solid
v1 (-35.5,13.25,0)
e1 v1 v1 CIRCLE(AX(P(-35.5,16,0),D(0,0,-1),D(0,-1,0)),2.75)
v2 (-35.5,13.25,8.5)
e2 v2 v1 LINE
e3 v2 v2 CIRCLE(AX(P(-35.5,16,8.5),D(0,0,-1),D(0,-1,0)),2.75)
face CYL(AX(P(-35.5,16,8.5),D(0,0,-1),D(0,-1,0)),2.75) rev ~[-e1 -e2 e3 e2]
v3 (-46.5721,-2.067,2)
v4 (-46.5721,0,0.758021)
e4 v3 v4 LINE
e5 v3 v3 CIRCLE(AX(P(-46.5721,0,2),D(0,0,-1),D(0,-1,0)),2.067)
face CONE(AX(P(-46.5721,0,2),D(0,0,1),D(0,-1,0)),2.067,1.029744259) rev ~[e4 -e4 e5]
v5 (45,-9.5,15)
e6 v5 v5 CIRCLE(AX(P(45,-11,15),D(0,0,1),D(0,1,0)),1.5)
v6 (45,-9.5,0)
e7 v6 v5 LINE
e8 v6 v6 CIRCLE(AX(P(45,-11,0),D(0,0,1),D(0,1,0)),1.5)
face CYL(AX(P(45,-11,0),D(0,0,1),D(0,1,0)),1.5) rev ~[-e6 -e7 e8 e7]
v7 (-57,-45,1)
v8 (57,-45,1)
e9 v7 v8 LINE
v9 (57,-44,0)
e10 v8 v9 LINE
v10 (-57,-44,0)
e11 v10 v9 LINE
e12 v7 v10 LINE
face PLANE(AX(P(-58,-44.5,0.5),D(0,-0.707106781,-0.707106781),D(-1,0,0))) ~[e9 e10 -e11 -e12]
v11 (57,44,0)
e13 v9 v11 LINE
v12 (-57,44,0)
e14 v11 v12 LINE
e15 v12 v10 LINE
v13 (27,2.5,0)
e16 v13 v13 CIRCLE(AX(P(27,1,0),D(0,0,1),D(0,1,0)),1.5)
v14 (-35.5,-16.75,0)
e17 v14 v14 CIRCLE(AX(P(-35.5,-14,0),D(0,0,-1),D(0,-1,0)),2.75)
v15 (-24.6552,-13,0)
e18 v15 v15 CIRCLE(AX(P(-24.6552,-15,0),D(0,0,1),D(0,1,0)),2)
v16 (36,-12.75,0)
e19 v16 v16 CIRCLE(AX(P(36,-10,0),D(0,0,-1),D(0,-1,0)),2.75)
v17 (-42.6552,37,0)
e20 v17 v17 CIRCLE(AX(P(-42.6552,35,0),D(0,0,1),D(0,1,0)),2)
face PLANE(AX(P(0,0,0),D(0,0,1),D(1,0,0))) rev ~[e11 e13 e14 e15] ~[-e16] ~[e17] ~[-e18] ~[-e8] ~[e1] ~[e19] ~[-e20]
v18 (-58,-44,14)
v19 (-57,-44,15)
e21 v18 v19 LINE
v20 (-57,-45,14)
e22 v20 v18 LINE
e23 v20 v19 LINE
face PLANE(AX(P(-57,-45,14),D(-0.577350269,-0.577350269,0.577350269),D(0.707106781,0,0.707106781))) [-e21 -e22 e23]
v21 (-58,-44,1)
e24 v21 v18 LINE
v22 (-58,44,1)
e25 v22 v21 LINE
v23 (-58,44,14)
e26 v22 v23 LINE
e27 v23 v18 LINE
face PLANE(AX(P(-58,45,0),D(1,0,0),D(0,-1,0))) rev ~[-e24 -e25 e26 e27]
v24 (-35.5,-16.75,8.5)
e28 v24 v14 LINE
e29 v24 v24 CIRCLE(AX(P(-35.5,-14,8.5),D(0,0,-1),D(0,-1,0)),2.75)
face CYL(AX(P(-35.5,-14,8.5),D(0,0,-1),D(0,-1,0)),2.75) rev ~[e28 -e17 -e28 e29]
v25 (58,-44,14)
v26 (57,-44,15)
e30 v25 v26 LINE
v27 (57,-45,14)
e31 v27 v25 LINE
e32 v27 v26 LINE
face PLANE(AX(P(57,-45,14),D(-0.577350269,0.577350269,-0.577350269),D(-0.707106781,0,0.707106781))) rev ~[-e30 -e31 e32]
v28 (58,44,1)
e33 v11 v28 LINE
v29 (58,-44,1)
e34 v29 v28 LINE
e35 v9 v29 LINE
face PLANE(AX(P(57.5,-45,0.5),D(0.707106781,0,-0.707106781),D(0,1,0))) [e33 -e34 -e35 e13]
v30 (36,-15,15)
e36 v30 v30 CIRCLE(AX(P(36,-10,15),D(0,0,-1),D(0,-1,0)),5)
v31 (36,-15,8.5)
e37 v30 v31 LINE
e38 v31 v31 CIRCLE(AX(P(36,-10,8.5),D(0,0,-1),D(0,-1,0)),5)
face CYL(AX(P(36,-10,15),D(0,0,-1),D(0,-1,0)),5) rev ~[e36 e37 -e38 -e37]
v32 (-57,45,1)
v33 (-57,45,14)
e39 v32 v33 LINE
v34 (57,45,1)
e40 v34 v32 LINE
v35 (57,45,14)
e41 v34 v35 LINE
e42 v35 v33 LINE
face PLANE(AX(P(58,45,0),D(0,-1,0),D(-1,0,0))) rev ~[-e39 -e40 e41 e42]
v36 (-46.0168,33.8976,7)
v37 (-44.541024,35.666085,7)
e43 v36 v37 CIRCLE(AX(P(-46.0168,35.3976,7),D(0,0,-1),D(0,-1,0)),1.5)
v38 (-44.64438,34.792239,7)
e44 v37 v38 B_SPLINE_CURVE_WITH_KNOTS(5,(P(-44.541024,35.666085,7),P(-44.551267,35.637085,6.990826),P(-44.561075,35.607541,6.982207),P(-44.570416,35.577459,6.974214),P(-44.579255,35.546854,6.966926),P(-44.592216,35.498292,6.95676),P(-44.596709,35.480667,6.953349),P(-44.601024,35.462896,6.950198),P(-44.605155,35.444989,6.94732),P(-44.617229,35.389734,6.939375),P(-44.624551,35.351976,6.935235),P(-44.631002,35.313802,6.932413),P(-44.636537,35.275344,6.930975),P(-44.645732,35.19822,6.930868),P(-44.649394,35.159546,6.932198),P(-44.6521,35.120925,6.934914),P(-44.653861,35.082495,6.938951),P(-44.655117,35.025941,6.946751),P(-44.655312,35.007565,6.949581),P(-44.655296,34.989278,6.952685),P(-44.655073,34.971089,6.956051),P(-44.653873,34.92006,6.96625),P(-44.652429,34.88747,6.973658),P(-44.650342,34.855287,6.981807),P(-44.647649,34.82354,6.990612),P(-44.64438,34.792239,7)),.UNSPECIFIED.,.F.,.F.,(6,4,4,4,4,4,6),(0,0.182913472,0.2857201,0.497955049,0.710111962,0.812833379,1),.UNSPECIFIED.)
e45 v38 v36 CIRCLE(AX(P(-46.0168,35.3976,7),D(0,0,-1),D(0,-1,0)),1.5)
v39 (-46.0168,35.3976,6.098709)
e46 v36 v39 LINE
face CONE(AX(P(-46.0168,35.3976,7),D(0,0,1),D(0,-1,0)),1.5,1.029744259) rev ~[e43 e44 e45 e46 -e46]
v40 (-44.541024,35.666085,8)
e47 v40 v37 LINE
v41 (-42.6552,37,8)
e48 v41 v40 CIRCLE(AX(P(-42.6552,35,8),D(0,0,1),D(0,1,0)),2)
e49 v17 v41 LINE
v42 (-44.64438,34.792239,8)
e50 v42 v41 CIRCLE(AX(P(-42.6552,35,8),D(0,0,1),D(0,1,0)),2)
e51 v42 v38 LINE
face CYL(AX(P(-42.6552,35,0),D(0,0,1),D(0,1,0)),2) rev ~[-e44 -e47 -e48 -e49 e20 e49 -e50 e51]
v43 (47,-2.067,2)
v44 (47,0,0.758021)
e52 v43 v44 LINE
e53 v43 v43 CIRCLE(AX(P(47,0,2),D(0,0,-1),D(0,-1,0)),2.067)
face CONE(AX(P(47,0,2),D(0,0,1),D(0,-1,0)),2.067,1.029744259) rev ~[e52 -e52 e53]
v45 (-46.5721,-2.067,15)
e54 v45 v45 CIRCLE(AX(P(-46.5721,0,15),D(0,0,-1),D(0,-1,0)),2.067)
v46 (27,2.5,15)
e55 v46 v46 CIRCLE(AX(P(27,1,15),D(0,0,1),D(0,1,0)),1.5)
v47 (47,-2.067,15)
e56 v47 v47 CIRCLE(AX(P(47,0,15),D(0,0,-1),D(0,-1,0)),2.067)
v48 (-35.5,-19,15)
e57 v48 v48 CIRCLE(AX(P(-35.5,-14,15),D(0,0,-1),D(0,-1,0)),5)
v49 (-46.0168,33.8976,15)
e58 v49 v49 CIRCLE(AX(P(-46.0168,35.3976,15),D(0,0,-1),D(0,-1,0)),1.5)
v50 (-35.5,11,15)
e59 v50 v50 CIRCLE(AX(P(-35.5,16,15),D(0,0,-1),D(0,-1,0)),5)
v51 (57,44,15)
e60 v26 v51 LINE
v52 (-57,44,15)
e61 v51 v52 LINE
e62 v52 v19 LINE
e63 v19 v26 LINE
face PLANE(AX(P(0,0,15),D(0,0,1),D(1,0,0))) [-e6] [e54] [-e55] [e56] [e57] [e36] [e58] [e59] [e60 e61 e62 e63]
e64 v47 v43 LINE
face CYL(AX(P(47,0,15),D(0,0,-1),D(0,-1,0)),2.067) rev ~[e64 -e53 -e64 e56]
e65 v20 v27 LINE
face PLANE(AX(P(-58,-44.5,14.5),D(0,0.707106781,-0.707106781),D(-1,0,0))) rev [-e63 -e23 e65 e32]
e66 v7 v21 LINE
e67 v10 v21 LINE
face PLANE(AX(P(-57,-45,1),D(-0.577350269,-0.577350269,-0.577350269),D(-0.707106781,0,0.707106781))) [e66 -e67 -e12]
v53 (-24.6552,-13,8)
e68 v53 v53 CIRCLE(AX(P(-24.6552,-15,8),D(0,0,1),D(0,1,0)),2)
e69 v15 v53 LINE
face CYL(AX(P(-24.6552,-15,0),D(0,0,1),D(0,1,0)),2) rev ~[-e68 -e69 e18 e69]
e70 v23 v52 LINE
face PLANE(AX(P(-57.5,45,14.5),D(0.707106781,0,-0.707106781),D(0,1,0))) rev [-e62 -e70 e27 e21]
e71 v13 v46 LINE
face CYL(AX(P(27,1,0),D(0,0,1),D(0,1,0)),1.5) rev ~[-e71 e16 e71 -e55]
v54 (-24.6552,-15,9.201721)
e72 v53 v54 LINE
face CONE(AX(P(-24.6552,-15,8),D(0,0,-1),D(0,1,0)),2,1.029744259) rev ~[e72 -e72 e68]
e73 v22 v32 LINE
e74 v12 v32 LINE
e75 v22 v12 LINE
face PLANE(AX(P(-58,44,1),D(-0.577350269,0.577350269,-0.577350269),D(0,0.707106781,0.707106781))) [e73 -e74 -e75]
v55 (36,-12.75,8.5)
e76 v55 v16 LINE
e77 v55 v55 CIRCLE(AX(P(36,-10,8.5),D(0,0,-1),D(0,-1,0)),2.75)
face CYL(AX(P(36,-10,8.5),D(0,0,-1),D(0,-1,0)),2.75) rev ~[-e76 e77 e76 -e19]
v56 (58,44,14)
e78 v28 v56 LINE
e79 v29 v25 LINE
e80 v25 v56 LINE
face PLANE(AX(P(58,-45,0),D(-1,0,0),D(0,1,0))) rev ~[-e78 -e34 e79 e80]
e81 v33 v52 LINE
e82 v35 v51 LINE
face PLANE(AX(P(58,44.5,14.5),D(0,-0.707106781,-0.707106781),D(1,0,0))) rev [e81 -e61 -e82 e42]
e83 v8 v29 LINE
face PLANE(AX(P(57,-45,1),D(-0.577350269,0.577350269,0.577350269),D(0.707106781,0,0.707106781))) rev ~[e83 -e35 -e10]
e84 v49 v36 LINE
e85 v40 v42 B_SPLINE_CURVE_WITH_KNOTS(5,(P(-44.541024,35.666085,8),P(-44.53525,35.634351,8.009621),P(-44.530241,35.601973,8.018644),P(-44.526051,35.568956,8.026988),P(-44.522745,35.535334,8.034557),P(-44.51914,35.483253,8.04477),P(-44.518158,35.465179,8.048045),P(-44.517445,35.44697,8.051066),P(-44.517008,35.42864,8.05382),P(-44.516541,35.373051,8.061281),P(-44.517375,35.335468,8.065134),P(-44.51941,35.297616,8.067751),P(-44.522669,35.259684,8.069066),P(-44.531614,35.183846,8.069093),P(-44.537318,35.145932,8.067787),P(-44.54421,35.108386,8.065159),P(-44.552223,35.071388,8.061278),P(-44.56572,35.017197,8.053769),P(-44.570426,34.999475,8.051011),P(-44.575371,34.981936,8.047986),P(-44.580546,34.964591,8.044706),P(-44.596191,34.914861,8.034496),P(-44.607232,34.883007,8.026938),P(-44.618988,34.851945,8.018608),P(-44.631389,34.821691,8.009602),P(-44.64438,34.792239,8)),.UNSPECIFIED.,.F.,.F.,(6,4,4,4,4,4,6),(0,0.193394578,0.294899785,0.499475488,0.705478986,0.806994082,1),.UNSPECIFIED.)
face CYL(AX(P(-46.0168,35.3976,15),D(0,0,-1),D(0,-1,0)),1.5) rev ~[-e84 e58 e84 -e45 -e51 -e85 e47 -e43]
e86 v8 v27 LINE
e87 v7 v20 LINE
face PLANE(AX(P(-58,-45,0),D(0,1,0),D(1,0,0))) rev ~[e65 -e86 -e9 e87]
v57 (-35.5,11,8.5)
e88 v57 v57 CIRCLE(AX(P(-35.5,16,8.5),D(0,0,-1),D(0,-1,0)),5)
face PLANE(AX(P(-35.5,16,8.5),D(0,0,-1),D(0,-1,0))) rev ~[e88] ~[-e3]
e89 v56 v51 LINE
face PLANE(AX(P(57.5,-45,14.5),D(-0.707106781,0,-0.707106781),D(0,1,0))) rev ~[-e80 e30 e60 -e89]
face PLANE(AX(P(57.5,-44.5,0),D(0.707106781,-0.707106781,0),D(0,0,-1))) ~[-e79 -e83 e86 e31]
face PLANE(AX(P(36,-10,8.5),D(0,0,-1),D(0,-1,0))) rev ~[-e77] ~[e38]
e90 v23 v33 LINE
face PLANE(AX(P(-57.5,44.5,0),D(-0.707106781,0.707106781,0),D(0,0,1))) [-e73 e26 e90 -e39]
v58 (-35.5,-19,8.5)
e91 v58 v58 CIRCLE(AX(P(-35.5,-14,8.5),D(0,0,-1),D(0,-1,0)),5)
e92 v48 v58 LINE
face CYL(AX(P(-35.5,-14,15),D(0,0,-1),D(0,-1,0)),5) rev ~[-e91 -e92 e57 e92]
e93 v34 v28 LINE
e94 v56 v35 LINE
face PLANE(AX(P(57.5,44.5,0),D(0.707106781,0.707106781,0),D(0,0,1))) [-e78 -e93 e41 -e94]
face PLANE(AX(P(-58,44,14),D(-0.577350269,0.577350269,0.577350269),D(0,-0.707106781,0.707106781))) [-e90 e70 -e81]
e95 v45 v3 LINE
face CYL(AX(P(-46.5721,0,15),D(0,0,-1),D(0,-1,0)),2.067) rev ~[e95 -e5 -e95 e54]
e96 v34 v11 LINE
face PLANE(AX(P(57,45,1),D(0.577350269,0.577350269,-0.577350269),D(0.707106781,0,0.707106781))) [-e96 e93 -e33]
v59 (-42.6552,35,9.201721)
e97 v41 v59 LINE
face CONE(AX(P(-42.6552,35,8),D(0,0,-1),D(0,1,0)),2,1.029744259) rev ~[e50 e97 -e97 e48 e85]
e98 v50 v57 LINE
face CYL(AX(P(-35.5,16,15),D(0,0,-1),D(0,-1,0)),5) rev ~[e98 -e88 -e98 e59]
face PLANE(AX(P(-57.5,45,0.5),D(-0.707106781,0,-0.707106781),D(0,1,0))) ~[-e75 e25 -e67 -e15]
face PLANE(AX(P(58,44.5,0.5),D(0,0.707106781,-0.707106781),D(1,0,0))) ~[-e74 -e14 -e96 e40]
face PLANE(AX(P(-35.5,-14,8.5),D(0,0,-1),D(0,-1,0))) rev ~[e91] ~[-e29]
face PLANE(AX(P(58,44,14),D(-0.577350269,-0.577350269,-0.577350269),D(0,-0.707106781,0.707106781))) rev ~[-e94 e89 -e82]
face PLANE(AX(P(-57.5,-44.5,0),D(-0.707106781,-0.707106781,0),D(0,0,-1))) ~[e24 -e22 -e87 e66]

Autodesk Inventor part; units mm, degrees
ref_plane "YZ Plane" through (0, 0, 0) normal (1, 0, 0) x (0, 1, 0)
ref_plane "XZ Plane" through (0, 0, 0) normal (0, 1, 0) x (-1, 0, 0)
ref_plane "XY Plane" through (0, 0, 0) normal (0, 0, 1) x (1, 0, 0)
sketch "Skizze1" plane through (0, 0, 0) normal (0, 0, 1) x (1, 0, 0)
  line L0 (-58, -45) -> (58, -45)
  line L1 (58, -45) -> (58, 45)
  line L2 (58, 45) -> (-58, 45)
  line L3 (-58, 45) -> (-58, -45)
  line L4 (-58, -45) -> (58, 45) construction
  line L5 (58, -45) -> (-58, 45) construction
  point P0 (0, 0)
  dimension "d0" = 116
  dimension "d1" = 90
extrude "Extrusion1" add sketch "Skizze1" along normal blind 15
sketch "Skizze2" plane through (0, 0, 15) normal (0, 0, 1) x (1, 0, 0)
  line L0 (58, -45) -> (58, 45) projected
  point P0 (0, 0)
  point P1 (47, 0)
  point P2 (58, 0)
  dimension "d11" = 11
hole "Bohrung1" at (47, 0, 15) direction (0, 0, -1) diameter 4.134 depth 13 tip angle 118 thread size "M5x0.8" class "6H" standard "ISO Metric profile"
sketch "Skizze4" plane through (0, 0, 15) normal (0, 0, 1) x (1, 0, 0)
  line L0 (-58, -45) -> (58, -45) projected
  line L1 (58, -45) -> (58, 45) projected
  point P0 (0, 0)
  point P1 (-35.5, 16)
  point P2 (36, -10)
  dimension "d20" = 35
  dimension "d21" = 61
  dimension "d22" = 22
  dimension "d23" = 71.5
hole "Bohrung3" at (-35.5, 16, 15) at (36, -10, 15) direction (0, 0, -1) diameter 5.5 end through all counterbore diameter 10 counterbore depth 6.5
sketch "Skizze5" plane through (0, 0, 15) normal (0, 0, 1) x (1, 0, 0)
  line L0 (-58, 45) -> (-58, -45) projected
  circle A0 centre (47, 0) radius 2.067 projected
  point P0 (0, 0)
  point P1 (-46.5721, 0)
  point P2 (-58, 0)
  dimension "d38" = 93.5721
hole "Bohrung4" at (-46.5721, 0, 15) direction (0, 0, -1) diameter 4.134 depth 13 tip angle 118 thread size "M5x0.8" class "6H" standard "ISO Metric profile"
sketch "Skizze6" plane through (0, 0, 15) normal (0, 0, 1) x (1, 0, 0)
  circle A0 centre (-35.5, 16) radius 2.75 projected
  point P0 (0, 0)
  point P1 (-35.5, -14)
  dimension "d39" = 30
hole "Bohrung5" at (-35.5, -14, 15) direction (0, 0, -1) diameter 5.5 depth 15 counterbore diameter 10 counterbore depth 6.5
sketch "Skizze7" plane through (0, 0, 15) normal (0, 0, 1) x (1, 0, 0)
  point P0 (0, 0)
  point P1 (-46.0168, 35.3976)
hole "Bohrung6" at (-46.0168, 35.3976, 15) direction (0, 0, -1) diameter 3 depth 8 tip angle 118
sketch "Skizze8" plane through (0, 0, 0) normal (0, 0, -1) x (-1, 0, 0)
  line L0 (58, -45) -> (-58, -45) projected
  line L1 (58, 45) -> (58, -45) projected
  point P0 (0, 0)
  point P1 (42.6552, 35)
  point P2 (24.6552, -15)
  point P3 (58, 0)
  dimension "d61" = 50
  dimension "d62" = 30
  dimension "d63" = 18
hole "Bohrung7" at (-42.6552, 35, 0) at (-24.6552, -15, 0) direction (0, 0, 1) diameter 4 depth 8 tip angle 118
sketch "Skizze10" plane through (0, 0, 0) normal (0, 0, -1) x (-1, 0, 0)
  line L0 (-58, -45) -> (-58, 45) projected
  line L1 (58, -45) -> (-58, -45) projected
  point P0 (0, 0)
  point P1 (-27, 1)
  point P2 (-45, -11)
  dimension "d71" = 18
  dimension "d72" = 31
  dimension "d73" = 34
  dimension "d74" = 12
hole "Bohrung8" at (27, 1, 0) at (45, -11, 0) direction (0, 0, 1) diameter 3 end through all
chamfer "Fasen1" distance 1 angle 45 12 edges at (58, 0, 0) (0, 45, 0) (-58, 0, 0) (0, -45, 0) (0, 45, 15) (-58, 45, 7.5) (58, 45, 7.5) (-58, 0, 15) (58, 0, 15) (-58, -45, 7.5) (58, -45, 7.5) (0, -45, 15)
properties part number "Grundplatte" material "Glas"
